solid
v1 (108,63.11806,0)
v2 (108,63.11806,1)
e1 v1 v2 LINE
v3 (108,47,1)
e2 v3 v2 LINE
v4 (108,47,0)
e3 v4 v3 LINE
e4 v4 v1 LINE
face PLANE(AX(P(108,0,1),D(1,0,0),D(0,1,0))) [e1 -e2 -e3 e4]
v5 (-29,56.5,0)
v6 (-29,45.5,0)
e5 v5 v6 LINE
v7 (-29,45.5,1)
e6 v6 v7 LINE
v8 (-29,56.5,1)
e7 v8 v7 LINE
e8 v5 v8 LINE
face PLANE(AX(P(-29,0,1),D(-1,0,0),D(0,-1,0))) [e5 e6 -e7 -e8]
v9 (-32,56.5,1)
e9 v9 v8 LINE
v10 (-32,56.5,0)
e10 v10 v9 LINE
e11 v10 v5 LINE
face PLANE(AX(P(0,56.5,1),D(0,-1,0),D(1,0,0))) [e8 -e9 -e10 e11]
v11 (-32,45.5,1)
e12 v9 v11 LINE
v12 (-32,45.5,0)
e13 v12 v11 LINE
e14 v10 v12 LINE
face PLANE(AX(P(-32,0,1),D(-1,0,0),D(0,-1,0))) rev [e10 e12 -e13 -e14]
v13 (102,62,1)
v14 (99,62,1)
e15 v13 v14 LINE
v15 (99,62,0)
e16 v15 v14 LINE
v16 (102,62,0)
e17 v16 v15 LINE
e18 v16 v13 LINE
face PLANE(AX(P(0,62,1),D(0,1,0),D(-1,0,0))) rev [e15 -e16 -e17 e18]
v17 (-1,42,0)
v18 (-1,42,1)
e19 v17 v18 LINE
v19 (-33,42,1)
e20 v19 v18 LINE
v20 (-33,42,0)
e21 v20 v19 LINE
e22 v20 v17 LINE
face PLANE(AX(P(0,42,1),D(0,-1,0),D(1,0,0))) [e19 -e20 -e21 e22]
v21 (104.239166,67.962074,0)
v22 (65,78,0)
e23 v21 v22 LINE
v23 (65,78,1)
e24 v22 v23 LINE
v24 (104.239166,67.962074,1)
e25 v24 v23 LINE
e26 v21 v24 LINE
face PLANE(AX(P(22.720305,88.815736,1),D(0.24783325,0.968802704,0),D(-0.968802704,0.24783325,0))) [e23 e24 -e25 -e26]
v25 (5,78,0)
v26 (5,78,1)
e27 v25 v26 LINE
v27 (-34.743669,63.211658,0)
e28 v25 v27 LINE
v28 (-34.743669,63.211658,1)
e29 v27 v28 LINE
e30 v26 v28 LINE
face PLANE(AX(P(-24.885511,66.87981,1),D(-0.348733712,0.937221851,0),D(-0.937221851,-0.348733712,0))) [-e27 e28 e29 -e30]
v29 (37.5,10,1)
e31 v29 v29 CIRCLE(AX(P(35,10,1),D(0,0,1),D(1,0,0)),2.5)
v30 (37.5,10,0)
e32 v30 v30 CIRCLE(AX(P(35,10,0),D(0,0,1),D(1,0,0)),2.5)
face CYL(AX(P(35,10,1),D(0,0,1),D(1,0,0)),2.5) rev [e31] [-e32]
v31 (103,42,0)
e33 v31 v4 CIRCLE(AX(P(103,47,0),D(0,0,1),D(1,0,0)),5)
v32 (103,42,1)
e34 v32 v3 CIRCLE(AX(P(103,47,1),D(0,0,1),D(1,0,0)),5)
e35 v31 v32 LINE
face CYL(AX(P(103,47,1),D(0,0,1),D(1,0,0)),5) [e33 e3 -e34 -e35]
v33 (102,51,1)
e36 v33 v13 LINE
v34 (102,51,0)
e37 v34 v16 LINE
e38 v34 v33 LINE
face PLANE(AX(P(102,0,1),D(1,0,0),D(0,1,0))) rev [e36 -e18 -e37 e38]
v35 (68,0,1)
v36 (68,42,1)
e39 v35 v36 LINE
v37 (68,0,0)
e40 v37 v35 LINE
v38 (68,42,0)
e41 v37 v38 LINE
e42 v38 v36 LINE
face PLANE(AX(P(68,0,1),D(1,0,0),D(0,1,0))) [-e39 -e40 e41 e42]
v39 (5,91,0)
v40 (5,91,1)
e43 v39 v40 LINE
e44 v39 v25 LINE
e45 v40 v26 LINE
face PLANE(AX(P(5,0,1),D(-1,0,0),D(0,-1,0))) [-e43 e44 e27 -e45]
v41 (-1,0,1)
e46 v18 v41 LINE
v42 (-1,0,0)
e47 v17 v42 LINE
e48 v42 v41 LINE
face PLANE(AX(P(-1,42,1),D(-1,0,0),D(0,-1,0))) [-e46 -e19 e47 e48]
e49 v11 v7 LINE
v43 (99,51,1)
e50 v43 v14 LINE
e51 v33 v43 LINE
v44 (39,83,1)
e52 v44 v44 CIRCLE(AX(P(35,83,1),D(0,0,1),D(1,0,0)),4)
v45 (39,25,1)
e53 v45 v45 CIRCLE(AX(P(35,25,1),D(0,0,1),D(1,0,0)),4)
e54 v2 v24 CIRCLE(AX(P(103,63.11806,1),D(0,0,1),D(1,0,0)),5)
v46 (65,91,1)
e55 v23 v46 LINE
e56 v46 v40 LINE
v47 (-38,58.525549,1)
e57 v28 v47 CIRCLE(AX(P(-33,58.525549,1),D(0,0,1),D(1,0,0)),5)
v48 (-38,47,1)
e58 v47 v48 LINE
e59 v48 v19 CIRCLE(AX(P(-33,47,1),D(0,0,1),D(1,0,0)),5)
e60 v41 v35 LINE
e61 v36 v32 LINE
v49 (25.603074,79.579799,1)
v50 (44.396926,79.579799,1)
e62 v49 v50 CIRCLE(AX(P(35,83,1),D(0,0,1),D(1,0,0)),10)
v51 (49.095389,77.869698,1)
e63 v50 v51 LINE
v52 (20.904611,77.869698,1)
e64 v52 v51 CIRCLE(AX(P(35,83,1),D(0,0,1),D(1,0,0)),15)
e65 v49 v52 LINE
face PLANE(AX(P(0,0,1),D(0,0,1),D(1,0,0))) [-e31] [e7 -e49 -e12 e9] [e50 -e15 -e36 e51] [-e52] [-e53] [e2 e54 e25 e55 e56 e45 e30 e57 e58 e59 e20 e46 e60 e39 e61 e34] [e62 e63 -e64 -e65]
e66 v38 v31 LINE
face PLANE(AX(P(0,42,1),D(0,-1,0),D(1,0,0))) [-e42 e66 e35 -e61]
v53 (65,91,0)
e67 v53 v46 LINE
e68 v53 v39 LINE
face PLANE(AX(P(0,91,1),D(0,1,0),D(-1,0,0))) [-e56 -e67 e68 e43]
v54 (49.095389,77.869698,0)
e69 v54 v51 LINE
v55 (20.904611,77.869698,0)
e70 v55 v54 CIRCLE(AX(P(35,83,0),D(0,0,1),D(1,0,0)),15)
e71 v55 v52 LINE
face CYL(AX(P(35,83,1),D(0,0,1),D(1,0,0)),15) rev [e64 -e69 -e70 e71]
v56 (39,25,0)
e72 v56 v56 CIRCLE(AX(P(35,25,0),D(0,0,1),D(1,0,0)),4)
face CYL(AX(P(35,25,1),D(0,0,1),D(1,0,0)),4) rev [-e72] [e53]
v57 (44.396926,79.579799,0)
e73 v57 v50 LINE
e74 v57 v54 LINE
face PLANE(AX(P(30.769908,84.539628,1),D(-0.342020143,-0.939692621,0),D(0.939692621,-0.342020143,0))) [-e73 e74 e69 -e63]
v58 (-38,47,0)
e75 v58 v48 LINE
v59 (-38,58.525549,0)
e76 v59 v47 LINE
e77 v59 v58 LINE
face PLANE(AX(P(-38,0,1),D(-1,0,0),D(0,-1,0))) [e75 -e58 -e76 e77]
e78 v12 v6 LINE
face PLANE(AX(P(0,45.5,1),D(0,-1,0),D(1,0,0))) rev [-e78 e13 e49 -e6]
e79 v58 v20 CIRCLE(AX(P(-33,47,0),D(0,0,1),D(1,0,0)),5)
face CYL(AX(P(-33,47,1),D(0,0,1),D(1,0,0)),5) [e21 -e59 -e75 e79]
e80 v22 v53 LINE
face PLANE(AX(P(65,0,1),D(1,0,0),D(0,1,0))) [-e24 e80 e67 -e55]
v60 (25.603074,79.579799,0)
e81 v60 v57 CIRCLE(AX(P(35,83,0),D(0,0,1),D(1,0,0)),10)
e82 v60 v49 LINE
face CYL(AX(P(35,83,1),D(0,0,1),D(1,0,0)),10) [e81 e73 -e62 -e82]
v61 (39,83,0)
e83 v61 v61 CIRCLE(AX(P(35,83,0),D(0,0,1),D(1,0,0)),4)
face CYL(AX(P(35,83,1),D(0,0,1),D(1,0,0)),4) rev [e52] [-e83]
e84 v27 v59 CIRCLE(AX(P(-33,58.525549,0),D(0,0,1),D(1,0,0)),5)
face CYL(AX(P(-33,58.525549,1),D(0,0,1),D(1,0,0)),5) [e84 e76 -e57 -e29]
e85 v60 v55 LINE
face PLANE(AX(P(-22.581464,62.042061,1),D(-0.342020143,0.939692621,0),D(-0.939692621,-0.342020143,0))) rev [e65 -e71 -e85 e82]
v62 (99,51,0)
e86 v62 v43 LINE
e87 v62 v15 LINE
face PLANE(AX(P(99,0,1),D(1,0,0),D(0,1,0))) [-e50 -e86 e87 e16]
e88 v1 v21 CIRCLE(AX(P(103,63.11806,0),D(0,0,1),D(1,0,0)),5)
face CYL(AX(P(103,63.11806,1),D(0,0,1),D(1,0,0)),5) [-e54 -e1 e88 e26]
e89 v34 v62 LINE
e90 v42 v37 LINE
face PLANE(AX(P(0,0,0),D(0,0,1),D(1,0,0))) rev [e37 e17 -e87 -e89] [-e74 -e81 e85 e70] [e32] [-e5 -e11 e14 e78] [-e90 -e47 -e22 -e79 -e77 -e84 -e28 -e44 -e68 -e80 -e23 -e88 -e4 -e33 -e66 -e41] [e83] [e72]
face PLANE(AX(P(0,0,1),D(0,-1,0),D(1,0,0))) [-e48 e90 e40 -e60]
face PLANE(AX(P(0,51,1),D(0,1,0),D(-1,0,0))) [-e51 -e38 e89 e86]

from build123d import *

# Parameters (mm, degrees)
SKETCH1_W                    = 68
SKETCH1_H                    = 42
BOSS_EXTRUDE1_DEPTH          = 1
SKETCH3_W                    = 1
SKETCH3_H                    = 42
EXTRUDE_THIN1_DEPTH          = 20
SKETCH4_R                    = 5
CUT_EXTRUDE1_DEPTH           = 144.394560566
SKETCH6_W                    = 3
SKETCH6_H                    = 11
CUT_EXTRUDE2_DEPTH           = 143.779550356
SKETCH6_3_R                  = 4
BOSS_EXTRUDE2_DEPTH          = 15
SKETCH6_4_R                  = 2.5
SKETCH6_4_R_2                = 4
BOSS_EXTRUDE3_DEPTH          = 6
SKETCH7_W                    = 1
SKETCH7_H                    = 42
BOSS_EXTRUDE5_DEPTH          = 1
FILLET2_R                    = 5
SKETCH8_W                    = 60
SKETCH8_H                    = 1
BOSS_EXTRUDE6_DEPTH          = 20
CONVERT_SOLID1_START         = -20
CONVERT_SOLID1_OUTLINE_W     = 1
CONVERT_SOLID1_OUTLINE_H     = 42
CONVERT_SOLID1_OUTLINE_W_2   = 60
CONVERT_SOLID1_OUTLINE_H_2   = 1
CONVERT_SOLID1_DEPTH         = 20
CONVERT_SOLID1_2_OUTLINE_R   = 2.5
CONVERT_SOLID1_2_OUTLINE_R_2 = 4
CONVERT_SOLID1_2_DEPTH       = 16


# Read off the part's stored shape, not the designer's step: Convert-Solid1
with BuildPart() as part:
    # Sketch1 → Boss-Extrude1 (new body)
    with BuildSketch(Plane.XY):
        Polygon((-38, 62), (-38, 42), (0, 42), (68, 42), (108, 42), (108, 67), (65, 78), (65, 91), (5, 91), (5, 78), align=None)
        with Locations((34, 21)):
            Rectangle(SKETCH1_W, SKETCH1_H)
    extrude(amount=BOSS_EXTRUDE1_DEPTH)

    # Sketch3 → Extrude-Thin1 (add)
    with BuildSketch(Plane(origin=(0, 0, 0), x_dir=(-1, 0, 0), z_dir=(0, 0, -1))):
        with Locations((0.5, 21)):
            Rectangle(SKETCH3_W, SKETCH3_H)
        with Locations((-67.5, 21)):
            Rectangle(SKETCH3_W, SKETCH3_H)
    extrude(amount=EXTRUDE_THIN1_DEPTH)


with BuildPart() as extrude_thin1_piece_1:
    # of the separate pieces the step leaves, piece 1, a body of its own (extrude_thin1_pieces)
    add(part.part.solids().sort_by_distance((-38, 62, 0))[0])


with BuildPart() as extrude_thin1_piece_2:
    # of the separate pieces the step leaves, piece 2, a body of its own (extrude_thin1_pieces)
    add(part.part.solids().sort_by_distance((0, 42, -20))[0])


with BuildPart() as cut_extrude1_tool:
    # Sketch4 → Cut-Extrude1 (new, through all)
    with BuildSketch(Plane.ZY.offset(1)):
        with Locations((-9.5, 15)):
            Circle(SKETCH4_R)
    extrude(amount=-CUT_EXTRUDE1_DEPTH)


with BuildPart() as extrude_thin1_piece_1_1:
    add(extrude_thin1_piece_1.part)

    # Cut-Extrude1: cut by cut_extrude1_tool
    add(cut_extrude1_tool.part, mode=Mode.SUBTRACT)

    # Sketch6 → Cut-Extrude2 (cut, through all)
    with BuildSketch(Plane.XY.offset(1)):
        with Locations((100.5, 56.5)):
            Rectangle(SKETCH6_W, SKETCH6_H)
        with Locations((-30.5, 51)):
            Rectangle(SKETCH6_W, SKETCH6_H)
        with BuildLine():
            Line((49.095389312, 77.86969785), (44.396926208, 79.579798567))
            ThreePointArc((44.396926208, 79.579798567), (35, 73), (25.603073792, 79.579798567))
            Line((25.603073792, 79.579798567), (20.904610688, 77.86969785))
            ThreePointArc((20.904610688, 77.86969785), (35, 68), (49.095389312, 77.86969785))
        make_face()
    extrude(amount=-CUT_EXTRUDE2_DEPTH, mode=Mode.SUBTRACT)

    # Sketch6<3> → Boss-Extrude2 (add)
    with BuildSketch(Plane.XY.offset(1)):
        with Locations((35, 83)):
            Circle(SKETCH6_3_R)
    extrude(amount=BOSS_EXTRUDE2_DEPTH)

    # Sketch6<4> → Boss-Extrude3 (add)
    with BuildSketch(Plane.XY.offset(1)):
        with Locations((35, 10)):
            Circle(SKETCH6_4_R)
        with Locations((35, 25)):
            Circle(SKETCH6_4_R_2)
    extrude(amount=BOSS_EXTRUDE3_DEPTH)



with BuildPart() as extrude_thin1_piece_2_1:
    add(extrude_thin1_piece_2.part)

    # Cut-Extrude1: cut by cut_extrude1_tool
    add(cut_extrude1_tool.part, mode=Mode.SUBTRACT)


with BuildPart() as extrude_thin1_piece_1_2:
    add(extrude_thin1_piece_1_1.part)

    add(extrude_thin1_piece_2_1.part)  # Boss-Extrude5 merges Extrude-Thin1 piece 2
    # Sketch7 → Boss-Extrude5 (add)
    with BuildSketch(Plane.XY):
        with Locations((-0.5, 21)):
            Rectangle(SKETCH7_W, SKETCH7_H)
    extrude(amount=BOSS_EXTRUDE5_DEPTH)

    # Fillet2
    fillet2_edges = [extrude_thin1_piece_1_2.edges().sort_by_distance(p)[0] for p in [
        (-0.5, 0, -20),
        (-38, 42, 0.5),
        (-38, 62, 0.5),
        (67.5, 0, -20),
        (108, 42, 0.5),
        (108, 67, 0.5),
        (67.5, 42, -20),
        (-0.5, 42, -20),
    ]]
    fillet(fillet2_edges, radius=FILLET2_R)

    # Sketch8 → Boss-Extrude6 (add)
    with BuildSketch(Plane(origin=(0, 0, 0), x_dir=(-1, 0, 0), z_dir=(0, 0, -1))):
        with Locations((-35, 90.5)):
            Rectangle(SKETCH8_W, SKETCH8_H)
    extrude(amount=BOSS_EXTRUDE6_DEPTH)

    # Convert-Solid1 outline → Convert-Solid1 (cut)
    with BuildSketch(Plane.XY.offset(CONVERT_SOLID1_START)):
        with Locations((-0.5, 21)):
            Rectangle(CONVERT_SOLID1_OUTLINE_W, CONVERT_SOLID1_OUTLINE_H)
        with Locations((67.5, 21)):
            Rectangle(CONVERT_SOLID1_OUTLINE_W, CONVERT_SOLID1_OUTLINE_H)
        with Locations((35, 90.5)):
            Rectangle(CONVERT_SOLID1_OUTLINE_W_2, CONVERT_SOLID1_OUTLINE_H_2)
    extrude(amount=CONVERT_SOLID1_DEPTH, mode=Mode.SUBTRACT)

    # Convert-Solid1 2 outline → Convert-Solid1 2 (cut)
    with BuildSketch(Plane.XY):
        with Locations((35, 10)):
            Circle(CONVERT_SOLID1_2_OUTLINE_R)
        with Locations((35, 25)):
            Circle(CONVERT_SOLID1_2_OUTLINE_R_2)
        with Locations((35, 83)):
            Circle(CONVERT_SOLID1_2_OUTLINE_R_2)
    extrude(amount=CONVERT_SOLID1_2_DEPTH, mode=Mode.SUBTRACT)


solid = extrude_thin1_piece_1_2.part
